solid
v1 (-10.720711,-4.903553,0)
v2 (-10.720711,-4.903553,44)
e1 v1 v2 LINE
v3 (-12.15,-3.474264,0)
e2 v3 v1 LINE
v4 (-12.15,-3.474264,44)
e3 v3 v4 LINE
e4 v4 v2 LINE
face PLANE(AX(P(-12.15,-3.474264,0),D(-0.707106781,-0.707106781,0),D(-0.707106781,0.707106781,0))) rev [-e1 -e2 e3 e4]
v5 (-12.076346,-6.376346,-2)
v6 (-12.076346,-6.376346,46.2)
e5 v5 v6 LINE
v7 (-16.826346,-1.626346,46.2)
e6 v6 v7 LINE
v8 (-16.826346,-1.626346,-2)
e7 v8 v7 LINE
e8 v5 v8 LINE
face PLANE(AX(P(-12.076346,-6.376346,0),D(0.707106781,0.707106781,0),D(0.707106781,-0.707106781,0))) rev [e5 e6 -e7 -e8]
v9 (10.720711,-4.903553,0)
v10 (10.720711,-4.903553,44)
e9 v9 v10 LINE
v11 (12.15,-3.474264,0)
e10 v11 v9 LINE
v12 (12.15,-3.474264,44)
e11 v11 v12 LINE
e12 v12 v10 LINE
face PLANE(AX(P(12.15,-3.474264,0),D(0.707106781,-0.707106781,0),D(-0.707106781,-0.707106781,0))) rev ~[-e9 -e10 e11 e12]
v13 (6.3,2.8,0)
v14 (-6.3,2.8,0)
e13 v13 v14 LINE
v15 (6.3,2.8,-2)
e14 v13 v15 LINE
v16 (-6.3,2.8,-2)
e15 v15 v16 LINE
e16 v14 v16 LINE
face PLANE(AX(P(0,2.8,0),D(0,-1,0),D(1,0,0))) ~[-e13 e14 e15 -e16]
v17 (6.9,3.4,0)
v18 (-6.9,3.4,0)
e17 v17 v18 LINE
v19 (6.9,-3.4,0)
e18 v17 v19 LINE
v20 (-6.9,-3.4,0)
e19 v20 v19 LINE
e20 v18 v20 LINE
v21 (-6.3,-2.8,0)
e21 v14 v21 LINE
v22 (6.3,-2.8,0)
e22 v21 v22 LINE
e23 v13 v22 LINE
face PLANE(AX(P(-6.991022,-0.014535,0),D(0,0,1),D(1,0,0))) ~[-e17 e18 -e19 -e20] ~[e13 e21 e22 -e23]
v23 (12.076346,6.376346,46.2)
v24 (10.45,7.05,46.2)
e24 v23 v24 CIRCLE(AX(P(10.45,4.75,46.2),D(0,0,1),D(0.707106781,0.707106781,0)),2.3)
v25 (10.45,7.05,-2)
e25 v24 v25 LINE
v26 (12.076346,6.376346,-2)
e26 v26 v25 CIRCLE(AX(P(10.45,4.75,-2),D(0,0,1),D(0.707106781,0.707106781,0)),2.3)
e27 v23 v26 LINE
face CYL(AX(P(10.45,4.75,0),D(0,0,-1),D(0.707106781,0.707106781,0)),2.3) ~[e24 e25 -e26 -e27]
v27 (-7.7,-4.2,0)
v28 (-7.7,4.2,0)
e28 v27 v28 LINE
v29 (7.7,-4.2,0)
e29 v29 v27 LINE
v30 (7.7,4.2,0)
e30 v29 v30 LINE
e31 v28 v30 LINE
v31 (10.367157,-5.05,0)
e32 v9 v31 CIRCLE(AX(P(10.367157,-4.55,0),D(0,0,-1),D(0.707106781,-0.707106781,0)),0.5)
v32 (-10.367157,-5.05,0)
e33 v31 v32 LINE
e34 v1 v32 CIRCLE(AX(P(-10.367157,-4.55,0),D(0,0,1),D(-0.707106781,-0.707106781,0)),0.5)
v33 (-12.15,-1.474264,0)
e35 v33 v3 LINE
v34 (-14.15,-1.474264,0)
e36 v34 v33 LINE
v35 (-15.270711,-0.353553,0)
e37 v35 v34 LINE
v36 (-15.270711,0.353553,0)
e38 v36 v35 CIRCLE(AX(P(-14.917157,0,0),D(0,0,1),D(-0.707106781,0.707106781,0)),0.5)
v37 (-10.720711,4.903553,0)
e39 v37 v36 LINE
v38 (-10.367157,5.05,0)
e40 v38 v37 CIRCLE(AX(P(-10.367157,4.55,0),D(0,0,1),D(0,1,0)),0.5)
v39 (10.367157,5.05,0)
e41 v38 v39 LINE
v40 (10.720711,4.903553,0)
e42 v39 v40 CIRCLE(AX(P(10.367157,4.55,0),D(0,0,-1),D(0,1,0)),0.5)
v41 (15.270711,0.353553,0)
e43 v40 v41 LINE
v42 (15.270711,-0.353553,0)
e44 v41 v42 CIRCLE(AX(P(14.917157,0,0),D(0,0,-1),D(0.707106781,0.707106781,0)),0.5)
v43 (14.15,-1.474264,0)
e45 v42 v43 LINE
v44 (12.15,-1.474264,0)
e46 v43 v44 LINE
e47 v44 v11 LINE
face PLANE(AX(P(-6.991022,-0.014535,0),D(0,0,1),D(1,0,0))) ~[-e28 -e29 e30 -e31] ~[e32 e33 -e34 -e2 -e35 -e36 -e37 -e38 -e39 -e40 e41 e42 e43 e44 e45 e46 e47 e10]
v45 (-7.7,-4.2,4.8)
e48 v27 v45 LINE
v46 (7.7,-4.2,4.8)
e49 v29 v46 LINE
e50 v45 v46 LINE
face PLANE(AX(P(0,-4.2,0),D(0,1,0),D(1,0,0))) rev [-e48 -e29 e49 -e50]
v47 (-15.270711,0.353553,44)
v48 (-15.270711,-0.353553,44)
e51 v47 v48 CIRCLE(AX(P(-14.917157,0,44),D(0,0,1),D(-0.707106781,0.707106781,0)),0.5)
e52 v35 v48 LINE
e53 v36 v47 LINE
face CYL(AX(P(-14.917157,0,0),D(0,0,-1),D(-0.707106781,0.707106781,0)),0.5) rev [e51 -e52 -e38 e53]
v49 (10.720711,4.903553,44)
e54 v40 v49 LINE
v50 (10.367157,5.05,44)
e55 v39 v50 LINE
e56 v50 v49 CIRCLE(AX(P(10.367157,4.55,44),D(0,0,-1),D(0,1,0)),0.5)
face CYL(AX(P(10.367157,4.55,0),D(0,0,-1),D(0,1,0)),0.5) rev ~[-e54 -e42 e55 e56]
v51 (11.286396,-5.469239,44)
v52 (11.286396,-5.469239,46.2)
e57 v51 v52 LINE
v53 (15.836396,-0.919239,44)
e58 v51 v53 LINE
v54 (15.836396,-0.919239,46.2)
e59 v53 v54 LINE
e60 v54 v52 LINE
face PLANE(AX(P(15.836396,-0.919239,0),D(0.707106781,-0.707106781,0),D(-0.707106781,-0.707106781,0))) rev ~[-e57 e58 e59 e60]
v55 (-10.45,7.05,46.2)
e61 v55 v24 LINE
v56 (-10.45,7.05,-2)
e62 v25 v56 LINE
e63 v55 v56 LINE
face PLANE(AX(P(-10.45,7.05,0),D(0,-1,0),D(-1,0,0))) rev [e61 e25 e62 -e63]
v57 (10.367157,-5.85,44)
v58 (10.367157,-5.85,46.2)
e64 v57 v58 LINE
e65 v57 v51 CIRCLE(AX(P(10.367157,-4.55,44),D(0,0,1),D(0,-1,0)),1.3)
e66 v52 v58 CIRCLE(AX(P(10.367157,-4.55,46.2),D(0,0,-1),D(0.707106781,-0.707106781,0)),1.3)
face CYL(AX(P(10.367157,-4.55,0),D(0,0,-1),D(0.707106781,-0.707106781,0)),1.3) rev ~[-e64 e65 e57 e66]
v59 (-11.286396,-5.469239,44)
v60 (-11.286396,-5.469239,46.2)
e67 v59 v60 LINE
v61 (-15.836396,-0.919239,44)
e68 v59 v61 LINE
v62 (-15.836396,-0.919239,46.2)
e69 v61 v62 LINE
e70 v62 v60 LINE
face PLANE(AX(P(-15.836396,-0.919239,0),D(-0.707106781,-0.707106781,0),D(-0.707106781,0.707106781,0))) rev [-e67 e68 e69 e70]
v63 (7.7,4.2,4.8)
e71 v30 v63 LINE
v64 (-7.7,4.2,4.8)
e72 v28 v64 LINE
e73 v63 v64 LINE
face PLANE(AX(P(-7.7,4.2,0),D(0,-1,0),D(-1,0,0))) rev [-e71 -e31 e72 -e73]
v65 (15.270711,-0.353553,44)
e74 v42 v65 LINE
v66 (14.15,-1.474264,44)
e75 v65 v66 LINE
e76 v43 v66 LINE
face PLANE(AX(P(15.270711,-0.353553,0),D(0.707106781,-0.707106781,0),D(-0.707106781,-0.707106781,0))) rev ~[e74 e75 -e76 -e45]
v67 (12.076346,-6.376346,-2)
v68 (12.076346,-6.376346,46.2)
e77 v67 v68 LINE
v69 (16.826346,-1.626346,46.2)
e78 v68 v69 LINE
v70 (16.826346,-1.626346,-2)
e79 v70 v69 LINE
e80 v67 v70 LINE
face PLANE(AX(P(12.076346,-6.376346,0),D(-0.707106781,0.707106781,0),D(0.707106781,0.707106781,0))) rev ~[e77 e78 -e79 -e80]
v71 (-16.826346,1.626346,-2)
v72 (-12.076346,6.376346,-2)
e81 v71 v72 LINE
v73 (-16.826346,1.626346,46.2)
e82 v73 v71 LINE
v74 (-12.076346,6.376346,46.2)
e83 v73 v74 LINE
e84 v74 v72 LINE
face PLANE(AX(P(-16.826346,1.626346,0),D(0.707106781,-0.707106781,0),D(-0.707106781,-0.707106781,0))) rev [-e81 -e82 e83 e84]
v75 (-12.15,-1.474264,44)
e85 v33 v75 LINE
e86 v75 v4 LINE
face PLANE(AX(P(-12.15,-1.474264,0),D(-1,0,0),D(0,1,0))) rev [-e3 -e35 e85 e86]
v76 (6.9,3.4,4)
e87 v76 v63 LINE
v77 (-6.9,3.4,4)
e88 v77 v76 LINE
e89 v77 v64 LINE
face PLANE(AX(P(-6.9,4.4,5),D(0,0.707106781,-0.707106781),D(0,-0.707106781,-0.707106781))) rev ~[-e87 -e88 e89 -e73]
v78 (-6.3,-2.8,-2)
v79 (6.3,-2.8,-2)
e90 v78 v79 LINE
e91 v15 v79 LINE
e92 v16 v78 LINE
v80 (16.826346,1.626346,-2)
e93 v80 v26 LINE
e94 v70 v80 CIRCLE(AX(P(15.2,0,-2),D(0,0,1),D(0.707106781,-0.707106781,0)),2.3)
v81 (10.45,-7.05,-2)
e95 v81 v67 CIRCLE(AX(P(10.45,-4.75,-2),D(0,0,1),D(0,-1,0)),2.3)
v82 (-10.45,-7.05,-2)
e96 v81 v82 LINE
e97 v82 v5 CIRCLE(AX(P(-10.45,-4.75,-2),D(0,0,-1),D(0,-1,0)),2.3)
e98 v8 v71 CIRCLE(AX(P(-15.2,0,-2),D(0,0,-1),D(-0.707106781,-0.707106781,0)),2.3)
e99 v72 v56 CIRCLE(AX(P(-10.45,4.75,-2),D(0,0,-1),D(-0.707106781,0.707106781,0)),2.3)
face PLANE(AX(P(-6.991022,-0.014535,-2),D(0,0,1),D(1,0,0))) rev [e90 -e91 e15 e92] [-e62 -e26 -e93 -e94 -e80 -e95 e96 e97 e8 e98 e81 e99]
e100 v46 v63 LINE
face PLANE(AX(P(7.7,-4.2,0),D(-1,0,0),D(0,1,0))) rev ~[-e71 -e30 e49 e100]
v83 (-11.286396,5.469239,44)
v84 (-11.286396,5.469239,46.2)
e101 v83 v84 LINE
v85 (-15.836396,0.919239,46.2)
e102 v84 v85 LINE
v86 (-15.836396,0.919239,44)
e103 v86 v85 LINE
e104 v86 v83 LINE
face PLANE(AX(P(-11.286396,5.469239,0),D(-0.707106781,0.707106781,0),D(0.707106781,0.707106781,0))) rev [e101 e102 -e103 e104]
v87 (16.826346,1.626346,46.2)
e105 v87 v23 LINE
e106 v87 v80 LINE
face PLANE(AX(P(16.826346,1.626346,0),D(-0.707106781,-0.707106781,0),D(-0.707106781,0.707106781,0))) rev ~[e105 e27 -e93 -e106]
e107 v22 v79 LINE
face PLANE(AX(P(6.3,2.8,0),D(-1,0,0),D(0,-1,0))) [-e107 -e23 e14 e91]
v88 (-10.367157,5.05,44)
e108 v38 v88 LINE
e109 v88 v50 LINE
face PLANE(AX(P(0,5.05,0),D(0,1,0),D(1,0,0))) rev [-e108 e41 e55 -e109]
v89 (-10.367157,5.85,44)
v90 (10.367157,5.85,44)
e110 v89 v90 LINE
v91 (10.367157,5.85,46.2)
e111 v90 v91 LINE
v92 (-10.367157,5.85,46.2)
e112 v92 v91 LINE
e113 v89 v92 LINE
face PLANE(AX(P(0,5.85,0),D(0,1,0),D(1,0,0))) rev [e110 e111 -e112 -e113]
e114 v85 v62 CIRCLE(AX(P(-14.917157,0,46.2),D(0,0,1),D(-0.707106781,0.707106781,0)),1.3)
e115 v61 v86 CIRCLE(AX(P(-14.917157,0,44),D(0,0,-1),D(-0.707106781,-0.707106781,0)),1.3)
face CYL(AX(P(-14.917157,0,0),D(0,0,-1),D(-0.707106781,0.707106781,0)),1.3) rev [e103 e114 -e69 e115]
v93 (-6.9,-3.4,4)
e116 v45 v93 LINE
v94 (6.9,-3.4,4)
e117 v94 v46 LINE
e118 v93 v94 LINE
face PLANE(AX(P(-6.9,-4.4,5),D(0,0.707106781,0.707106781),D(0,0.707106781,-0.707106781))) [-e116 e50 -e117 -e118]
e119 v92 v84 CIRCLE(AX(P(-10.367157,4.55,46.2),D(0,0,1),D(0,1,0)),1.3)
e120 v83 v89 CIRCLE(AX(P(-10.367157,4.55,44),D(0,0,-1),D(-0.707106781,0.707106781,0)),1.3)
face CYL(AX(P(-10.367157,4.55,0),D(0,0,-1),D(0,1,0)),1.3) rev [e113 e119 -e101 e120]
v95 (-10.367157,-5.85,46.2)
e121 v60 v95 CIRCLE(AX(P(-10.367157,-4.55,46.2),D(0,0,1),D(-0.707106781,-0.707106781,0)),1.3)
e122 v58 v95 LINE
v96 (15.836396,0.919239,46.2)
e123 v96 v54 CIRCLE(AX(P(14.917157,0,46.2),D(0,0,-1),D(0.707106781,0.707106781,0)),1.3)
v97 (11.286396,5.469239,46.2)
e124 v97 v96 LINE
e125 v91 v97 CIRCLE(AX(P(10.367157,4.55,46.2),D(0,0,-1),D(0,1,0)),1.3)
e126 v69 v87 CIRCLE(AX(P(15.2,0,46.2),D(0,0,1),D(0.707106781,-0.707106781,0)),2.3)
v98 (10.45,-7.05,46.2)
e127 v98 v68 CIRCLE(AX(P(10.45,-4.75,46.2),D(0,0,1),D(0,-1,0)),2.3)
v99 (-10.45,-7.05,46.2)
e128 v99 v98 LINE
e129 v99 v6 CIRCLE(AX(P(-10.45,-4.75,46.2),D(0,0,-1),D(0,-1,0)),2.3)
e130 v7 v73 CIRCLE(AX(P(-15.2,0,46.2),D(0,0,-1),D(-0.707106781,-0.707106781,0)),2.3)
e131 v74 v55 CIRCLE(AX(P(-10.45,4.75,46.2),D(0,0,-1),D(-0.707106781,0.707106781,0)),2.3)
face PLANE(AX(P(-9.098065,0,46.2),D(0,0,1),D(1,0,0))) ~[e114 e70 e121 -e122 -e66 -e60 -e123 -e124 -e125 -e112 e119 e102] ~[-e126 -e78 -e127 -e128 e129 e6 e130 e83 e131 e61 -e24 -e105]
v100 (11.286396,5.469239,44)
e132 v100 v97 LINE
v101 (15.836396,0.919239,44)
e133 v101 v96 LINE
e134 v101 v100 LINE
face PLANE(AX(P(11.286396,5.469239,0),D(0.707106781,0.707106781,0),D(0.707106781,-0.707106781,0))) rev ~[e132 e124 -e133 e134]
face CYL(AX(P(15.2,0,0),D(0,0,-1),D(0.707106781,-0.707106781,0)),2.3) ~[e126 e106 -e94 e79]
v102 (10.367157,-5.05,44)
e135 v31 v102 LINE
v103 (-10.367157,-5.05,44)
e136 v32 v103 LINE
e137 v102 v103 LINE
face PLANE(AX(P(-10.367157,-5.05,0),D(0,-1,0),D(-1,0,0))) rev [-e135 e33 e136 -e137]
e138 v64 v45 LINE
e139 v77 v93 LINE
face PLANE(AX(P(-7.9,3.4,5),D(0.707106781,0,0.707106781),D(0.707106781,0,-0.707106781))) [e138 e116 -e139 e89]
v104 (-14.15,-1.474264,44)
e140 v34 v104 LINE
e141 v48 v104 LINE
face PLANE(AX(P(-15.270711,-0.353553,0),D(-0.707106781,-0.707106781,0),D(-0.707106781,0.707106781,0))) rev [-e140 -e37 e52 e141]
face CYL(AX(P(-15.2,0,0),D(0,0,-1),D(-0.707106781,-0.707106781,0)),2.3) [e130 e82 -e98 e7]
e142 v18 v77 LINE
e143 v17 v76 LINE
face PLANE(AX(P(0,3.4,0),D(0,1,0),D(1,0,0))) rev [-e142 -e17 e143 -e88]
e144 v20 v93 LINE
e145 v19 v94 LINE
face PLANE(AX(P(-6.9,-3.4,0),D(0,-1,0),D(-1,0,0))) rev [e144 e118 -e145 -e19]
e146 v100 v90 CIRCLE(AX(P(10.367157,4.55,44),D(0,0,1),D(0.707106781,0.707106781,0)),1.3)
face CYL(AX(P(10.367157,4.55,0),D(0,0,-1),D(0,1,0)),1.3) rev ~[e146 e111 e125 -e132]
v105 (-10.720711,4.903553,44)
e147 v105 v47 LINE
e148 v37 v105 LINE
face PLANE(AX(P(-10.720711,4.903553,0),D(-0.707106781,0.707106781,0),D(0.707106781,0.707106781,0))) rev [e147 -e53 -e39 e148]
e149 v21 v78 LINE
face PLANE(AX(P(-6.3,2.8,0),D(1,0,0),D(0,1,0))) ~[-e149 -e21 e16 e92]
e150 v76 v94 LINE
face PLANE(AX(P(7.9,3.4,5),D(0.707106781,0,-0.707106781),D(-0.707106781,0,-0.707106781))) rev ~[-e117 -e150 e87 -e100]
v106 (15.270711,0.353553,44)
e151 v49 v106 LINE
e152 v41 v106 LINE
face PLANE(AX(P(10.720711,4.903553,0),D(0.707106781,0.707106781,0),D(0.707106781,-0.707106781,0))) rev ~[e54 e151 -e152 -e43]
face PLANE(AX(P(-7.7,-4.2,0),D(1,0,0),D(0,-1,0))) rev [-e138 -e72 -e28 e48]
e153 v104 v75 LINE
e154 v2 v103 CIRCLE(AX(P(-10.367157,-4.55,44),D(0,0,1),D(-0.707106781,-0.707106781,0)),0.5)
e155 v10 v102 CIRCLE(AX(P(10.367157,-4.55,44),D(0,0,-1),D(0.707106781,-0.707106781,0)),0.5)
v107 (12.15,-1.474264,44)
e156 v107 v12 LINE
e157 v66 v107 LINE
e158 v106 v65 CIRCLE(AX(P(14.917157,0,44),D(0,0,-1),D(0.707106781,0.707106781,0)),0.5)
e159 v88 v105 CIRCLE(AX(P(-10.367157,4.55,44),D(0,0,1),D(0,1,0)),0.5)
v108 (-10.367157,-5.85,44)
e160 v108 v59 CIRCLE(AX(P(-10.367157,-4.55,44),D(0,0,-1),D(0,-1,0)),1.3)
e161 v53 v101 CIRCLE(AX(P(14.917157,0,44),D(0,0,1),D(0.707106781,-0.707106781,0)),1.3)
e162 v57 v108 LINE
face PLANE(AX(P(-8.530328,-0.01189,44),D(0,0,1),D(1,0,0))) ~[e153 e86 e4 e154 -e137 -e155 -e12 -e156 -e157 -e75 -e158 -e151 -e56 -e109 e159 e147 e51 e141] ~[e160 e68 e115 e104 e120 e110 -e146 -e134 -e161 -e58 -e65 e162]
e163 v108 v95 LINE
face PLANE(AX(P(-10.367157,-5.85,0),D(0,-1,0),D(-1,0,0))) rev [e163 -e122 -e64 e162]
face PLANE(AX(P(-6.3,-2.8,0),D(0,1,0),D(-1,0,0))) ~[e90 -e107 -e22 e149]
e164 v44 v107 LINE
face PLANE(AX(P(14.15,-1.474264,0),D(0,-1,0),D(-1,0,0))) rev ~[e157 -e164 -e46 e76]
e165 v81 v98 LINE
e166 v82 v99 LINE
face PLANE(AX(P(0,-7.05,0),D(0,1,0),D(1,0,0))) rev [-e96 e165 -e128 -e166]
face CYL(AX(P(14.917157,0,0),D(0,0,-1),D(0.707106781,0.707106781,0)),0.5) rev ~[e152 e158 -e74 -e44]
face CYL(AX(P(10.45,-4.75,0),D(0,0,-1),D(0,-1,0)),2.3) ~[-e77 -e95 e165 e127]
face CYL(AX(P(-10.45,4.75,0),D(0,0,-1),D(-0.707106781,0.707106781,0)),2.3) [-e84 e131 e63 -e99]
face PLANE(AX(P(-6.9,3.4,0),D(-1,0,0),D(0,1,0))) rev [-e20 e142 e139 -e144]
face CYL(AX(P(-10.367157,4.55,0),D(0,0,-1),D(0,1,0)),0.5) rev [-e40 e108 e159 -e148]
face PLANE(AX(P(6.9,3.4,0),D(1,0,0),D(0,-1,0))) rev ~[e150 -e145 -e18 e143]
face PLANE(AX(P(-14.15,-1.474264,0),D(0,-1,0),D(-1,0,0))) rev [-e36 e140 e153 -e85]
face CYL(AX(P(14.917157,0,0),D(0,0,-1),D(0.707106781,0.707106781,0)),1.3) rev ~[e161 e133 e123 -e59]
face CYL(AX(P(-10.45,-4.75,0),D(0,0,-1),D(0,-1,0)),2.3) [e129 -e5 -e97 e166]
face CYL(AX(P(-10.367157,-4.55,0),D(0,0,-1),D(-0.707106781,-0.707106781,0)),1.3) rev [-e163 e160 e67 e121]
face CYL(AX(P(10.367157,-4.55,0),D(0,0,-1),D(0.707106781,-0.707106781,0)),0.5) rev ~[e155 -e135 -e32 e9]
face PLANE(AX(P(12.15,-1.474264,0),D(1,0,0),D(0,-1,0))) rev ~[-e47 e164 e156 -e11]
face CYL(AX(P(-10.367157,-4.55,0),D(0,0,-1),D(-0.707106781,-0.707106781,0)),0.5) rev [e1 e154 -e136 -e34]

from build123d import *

# Parameters (mm, degrees)
F1_DEPTH     = 2
F2_DEPTH     = 5
F3_DEPTH     = 44
F4_DEPTH     = 46.2
F6_T1_DEPTH  = 6.8
F6_T3_DEPTH  = 13.8
F6_T9_DEPTH  = 16.371682988
F6_T15_DEPTH = 9.371682988
F6_T24_DEPTH = 9.371682988
F6_T30_DEPTH = 16.371682988
F6_T39_DEPTH = 16.371682988
F6_T45_DEPTH = 9.371682988
F6_T54_DEPTH = 16.371682988
F6_T60_DEPTH = 9.371682988


# Not quite as in the source:
# - a fillet or chamfer that OpenCascade refuses, or shapes differently, is made with other operations: its cross-section is extruded or revolved along the edge and cut away or added
# - a feature names something its author has since deleted; it is built from what else it names


with BuildPart() as f1:
    # F0 (on Top) → F1 (new body)
    with BuildSketch(Plane.XY):
        with BuildLine():
            Line((10.3671572875, 5.05), (0, 5.05))
            Line((0, 5.05), (0, 4.2))
            Line((0, 4.2), (7.7, 4.2))
            Line((7.7, 4.2), (7.7, -4.2))
            Line((7.7, -4.2), (0, -4.2))
            Line((0, -4.2), (0, -5.05))
            Line((0, -5.05), (10.3671572875, -5.05))
            ThreePointArc((10.3671572875, -5.05), (10.5584990037, -5.0119397663), (10.7207106781, -4.9035533906))
            Line((10.7207106781, -4.9035533906), (12.15, -3.4742640687))
            Line((12.15, -3.4742640687), (12.15, -1.4742640687))
            Line((12.15, -1.4742640687), (14.15, -1.4742640687))
            Line((14.15, -1.4742640687), (15.2707106781, -0.3535533906))
            ThreePointArc((15.2707106781, -0.3535533906), (15.4171572875, 0), (15.2707106781, 0.3535533906))
            Line((15.2707106781, 0.3535533906), (10.7207106781, 4.9035533906))
            ThreePointArc((10.7207106781, 4.9035533906), (10.5584990037, 5.0119397663), (10.3671572875, 5.05))
        make_face()
        Polygon((6.9, 3.4), (0, 3.4), (0, 2.8), (6.3, 2.8), (6.3, -2.8), (0, -2.8), (0, -3.4), (6.9, -3.4), align=None)
        Polygon((7.7, 4.2), (0, 4.2), (0, 3.4), (6.9, 3.4), (6.9, -3.4), (0, -3.4), (0, -4.2), (7.7, -4.2), align=None)
        with BuildLine():
            Line((10.45, 7.05), (0, 7.05))
            Line((0, 7.05), (0, 5.85))
            Line((0, 5.85), (10.3671572875, 5.85))
            ThreePointArc((10.3671572875, 5.85), (10.8646457496, 5.7510433923), (11.2863961031, 5.4692388155))
            Line((11.2863961031, 5.4692388155), (15.8363961031, 0.9192388155))
            ThreePointArc((15.8363961031, 0.9192388155), (16.2171572875, 0), (15.8363961031, -0.9192388155))
            Line((15.8363961031, -0.9192388155), (11.2863961031, -5.4692388155))
            ThreePointArc((11.2863961031, -5.4692388155), (10.8646457496, -5.7510433923), (10.3671572875, -5.85))
            Line((10.3671572875, -5.85), (0, -5.85))
            Line((0, -5.85), (0, -7.05))
            Line((0, -7.05), (10.45, -7.05))
            ThreePointArc((10.45, -7.05), (11.3301718944, -6.8749229248), (12.0763455967, -6.3763455967))
            Line((12.0763455967, -6.3763455967), (16.8263455967, -1.6263455967))
            ThreePointArc((16.8263455967, -1.6263455967), (17.5, 0), (16.8263455967, 1.6263455967))
            Line((16.8263455967, 1.6263455967), (12.0763455967, 6.3763455967))
            ThreePointArc((12.0763455967, 6.3763455967), (11.3301718944, 6.8749229248), (10.45, 7.05))
        make_face()
        with BuildLine():
            Line((10.3671572875, 5.85), (0, 5.85))
            Line((0, 5.85), (0, 5.05))
            Line((0, 5.05), (10.3671572875, 5.05))
            ThreePointArc((10.3671572875, 5.05), (10.5584990037, 5.0119397663), (10.7207106781, 4.9035533906))
            Line((10.7207106781, 4.9035533906), (15.2707106781, 0.3535533906))
            ThreePointArc((15.2707106781, 0.3535533906), (15.4171572875, 0), (15.2707106781, -0.3535533906))
            Line((15.2707106781, -0.3535533906), (14.15, -1.4742640687))
            Line((14.15, -1.4742640687), (12.15, -1.4742640687))
            Line((12.15, -1.4742640687), (12.15, -3.4742640687))
            Line((12.15, -3.4742640687), (10.7207106781, -4.9035533906))
            ThreePointArc((10.7207106781, -4.9035533906), (10.5584990037, -5.0119397663), (10.3671572875, -5.05))
            Line((10.3671572875, -5.05), (0, -5.05))
            Line((0, -5.05), (0, -5.85))
            Line((0, -5.85), (10.3671572875, -5.85))
            ThreePointArc((10.3671572875, -5.85), (10.8646457496, -5.7510433923), (11.2863961031, -5.4692388155))
            Line((11.2863961031, -5.4692388155), (15.8363961031, -0.9192388155))
            ThreePointArc((15.8363961031, -0.9192388155), (16.2171572875, 0), (15.8363961031, 0.9192388155))
            Line((15.8363961031, 0.9192388155), (11.2863961031, 5.4692388155))
            ThreePointArc((11.2863961031, 5.4692388155), (10.8646457496, 5.7510433923), (10.3671572875, 5.85))
        make_face()
    extrude(amount=-F1_DEPTH)

    # F0 (on Top) → F2 (join)
    with BuildSketch(Plane.XY):
        Polygon((7.7, 4.2), (0, 4.2), (0, 3.4), (6.9, 3.4), (6.9, -3.4), (0, -3.4), (0, -4.2), (7.7, -4.2), align=None)
    extrude(amount=F2_DEPTH)

    # F0 (on Top) → F3 (join)
    with BuildSketch(Plane.XY):
        with BuildLine():
            Line((10.3671572875, 5.85), (0, 5.85))
            Line((0, 5.85), (0, 5.05))
            Line((0, 5.05), (10.3671572875, 5.05))
            ThreePointArc((10.3671572875, 5.05), (10.5584990037, 5.0119397663), (10.7207106781, 4.9035533906))
            Line((10.7207106781, 4.9035533906), (15.2707106781, 0.3535533906))
            ThreePointArc((15.2707106781, 0.3535533906), (15.4171572875, 0), (15.2707106781, -0.3535533906))
            Line((15.2707106781, -0.3535533906), (14.15, -1.4742640687))
            Line((14.15, -1.4742640687), (12.15, -1.4742640687))
            Line((12.15, -1.4742640687), (12.15, -3.4742640687))
            Line((12.15, -3.4742640687), (10.7207106781, -4.9035533906))
            ThreePointArc((10.7207106781, -4.9035533906), (10.5584990037, -5.0119397663), (10.3671572875, -5.05))
            Line((10.3671572875, -5.05), (0, -5.05))
            Line((0, -5.05), (0, -5.85))
            Line((0, -5.85), (10.3671572875, -5.85))
            ThreePointArc((10.3671572875, -5.85), (10.8646457496, -5.7510433923), (11.2863961031, -5.4692388155))
            Line((11.2863961031, -5.4692388155), (15.8363961031, -0.9192388155))
            ThreePointArc((15.8363961031, -0.9192388155), (16.2171572875, 0), (15.8363961031, 0.9192388155))
            Line((15.8363961031, 0.9192388155), (11.2863961031, 5.4692388155))
            ThreePointArc((11.2863961031, 5.4692388155), (10.8646457496, 5.7510433923), (10.3671572875, 5.85))
        make_face()
    extrude(amount=F3_DEPTH)

    # F0 (on Top) → F4 (join)
    with BuildSketch(Plane.XY):
        with BuildLine():
            Line((10.45, 7.05), (0, 7.05))
            Line((0, 7.05), (0, 5.85))
            Line((0, 5.85), (10.3671572875, 5.85))
            ThreePointArc((10.3671572875, 5.85), (10.8646457496, 5.7510433923), (11.2863961031, 5.4692388155))
            Line((11.2863961031, 5.4692388155), (15.8363961031, 0.9192388155))
            ThreePointArc((15.8363961031, 0.9192388155), (16.2171572875, 0), (15.8363961031, -0.9192388155))
            Line((15.8363961031, -0.9192388155), (11.2863961031, -5.4692388155))
            ThreePointArc((11.2863961031, -5.4692388155), (10.8646457496, -5.7510433923), (10.3671572875, -5.85))
            Line((10.3671572875, -5.85), (0, -5.85))
            Line((0, -5.85), (0, -7.05))
            Line((0, -7.05), (10.45, -7.05))
            ThreePointArc((10.45, -7.05), (11.3301718944, -6.8749229248), (12.0763455967, -6.3763455967))
            Line((12.0763455967, -6.3763455967), (16.8263455967, -1.6263455967))
            ThreePointArc((16.8263455967, -1.6263455967), (17.5, 0), (16.8263455967, 1.6263455967))
            Line((16.8263455967, 1.6263455967), (12.0763455967, 6.3763455967))
            ThreePointArc((12.0763455967, 6.3763455967), (11.3301718944, 6.8749229248), (10.45, 7.05))
        make_face()
    extrude(amount=F4_DEPTH)

    # F5: F1 across face


with BuildPart() as f1_1:
    add(f1.part)
    add(f1.part.mirror(Plane(origin=(0, 5.8802646888, 19.9395384914), x_dir=(0, -1, 0), z_dir=(-1, 0, 0))))

    # F6: chamfer of 1 on 4 edges, made by hand

    # F6_s2 → F6_t1 (cut)
    with BuildSketch(Plane.XZ.offset(-3.4)):
        Polygon((7.9, 5), (6.9, 4), (6.9, 5), align=None)
        Polygon((-7.9, 5), (-6.9, 4), (-6.9, 5), align=None)
    extrude(amount=F6_T1_DEPTH, mode=Mode.SUBTRACT)

    # F6_s4 → F6_t3 (cut)
    with BuildSketch(Plane.YZ.offset(-6.9)):
        Polygon((4.4, 5), (3.4, 4), (3.4, 5), align=None)
        Polygon((-4.4, 5), (-3.4, 4), (-3.4, 5), align=None)
    extrude(amount=F6_T3_DEPTH, mode=Mode.SUBTRACT)


with BuildPart() as f6_tool7:
    # F6_s8 → F6_t9 (new body)
    with BuildSketch(Plane.YZ.offset(9.471682988)):
        Polygon((4.4, 5), (3.4, 4), (3.4, 5), align=None)
    extrude(amount=-F6_T9_DEPTH)

    split(bisect_by=Plane.YZ.offset(7.7), keep=Keep.BOTTOM)

    split(bisect_by=Plane.YZ.offset(6.9), keep=Keep.TOP)

    split(bisect_by=Plane.XZ.offset(-4.2), keep=Keep.TOP)


with BuildPart() as f6_tool13:
    # F6_s14 → F6_t15 (new body)
    with BuildSketch(Plane.XZ.offset(-5.971682988)):
        Polygon((7.9, 5), (6.9, 4), (6.9, 5), align=None)
    extrude(amount=F6_T15_DEPTH)

    split(bisect_by=Plane.YZ.offset(7.7), keep=Keep.BOTTOM)

    split(bisect_by=Plane.XZ.offset(-3.4), keep=Keep.BOTTOM)

    split(bisect_by=Plane.XZ.offset(-4.2), keep=Keep.TOP)


with BuildPart() as f6_tool7_1:
    add(f6_tool7.part)

    # F6_t19: intersect F6_tool13
    add(f6_tool13.part, mode=Mode.INTERSECT)


with BuildPart() as f1_2:
    add(f1_1.part)

    # F6_t5: cut F6_tool7
    add(f6_tool7_1.part, mode=Mode.SUBTRACT)


with BuildPart() as f6_tool22:
    # F6_s23 → F6_t24 (new body)
    with BuildSketch(Plane.XZ.offset(-3.4)):
        Polygon((7.9, 5), (6.9, 4), (6.9, 5), align=None)
    extrude(amount=F6_T24_DEPTH)

    split(bisect_by=Plane.YZ.offset(7.7), keep=Keep.BOTTOM)

    split(bisect_by=Plane.XZ.offset(3.4), keep=Keep.TOP)

    split(bisect_by=Plane.XZ.offset(4.2), keep=Keep.BOTTOM)


with BuildPart() as f6_tool28:
    # F6_s29 → F6_t30 (new body)
    with BuildSketch(Plane.YZ.offset(-6.9)):
        Polygon((-4.4, 5), (-3.4, 4), (-3.4, 5), align=None)
    extrude(amount=F6_T30_DEPTH)

    split(bisect_by=Plane.YZ.offset(7.7), keep=Keep.BOTTOM)

    split(bisect_by=Plane.YZ.offset(6.9), keep=Keep.TOP)

    split(bisect_by=Plane.XZ.offset(4.2), keep=Keep.BOTTOM)


with BuildPart() as f6_tool22_1:
    add(f6_tool22.part)

    # F6_t34: intersect F6_tool28
    add(f6_tool28.part, mode=Mode.INTERSECT)


with BuildPart() as f1_3:
    add(f1_2.part)

    # F6_t20: cut F6_tool22
    add(f6_tool22_1.part, mode=Mode.SUBTRACT)


with BuildPart() as f6_tool37:
    # F6_s38 → F6_t39 (new body)
    with BuildSketch(Plane.YZ.offset(6.9)):
        Polygon((4.4, 5), (3.4, 4), (3.4, 5), align=None)
    extrude(amount=-F6_T39_DEPTH)

    split(bisect_by=Plane.YZ.offset(-6.9), keep=Keep.BOTTOM)

    split(bisect_by=Plane.XZ.offset(-4.2), keep=Keep.TOP)

    split(bisect_by=Plane.YZ.offset(-7.7), keep=Keep.TOP)


with BuildPart() as f6_tool43:
    # F6_s44 → F6_t45 (new body)
    with BuildSketch(Plane.XZ.offset(-5.971682988)):
        Polygon((-7.9, 5), (-6.9, 4), (-6.9, 5), align=None)
    extrude(amount=F6_T45_DEPTH)

    split(bisect_by=Plane.XZ.offset(-3.4), keep=Keep.BOTTOM)

    split(bisect_by=Plane.XZ.offset(-4.2), keep=Keep.TOP)

    split(bisect_by=Plane.YZ.offset(-7.7), keep=Keep.TOP)


with BuildPart() as f6_tool37_1:
    add(f6_tool37.part)

    # F6_t49: intersect F6_tool43
    add(f6_tool43.part, mode=Mode.INTERSECT)


with BuildPart() as f1_4:
    add(f1_3.part)

    # F6_t35: cut F6_tool37
    add(f6_tool37_1.part, mode=Mode.SUBTRACT)


with BuildPart() as f6_tool52:
    # F6_s53 → F6_t54 (new body)
    with BuildSketch(Plane.YZ.offset(-9.471682988)):
        Polygon((-4.4, 5), (-3.4, 4), (-3.4, 5), align=None)
    extrude(amount=F6_T54_DEPTH)

    split(bisect_by=Plane.YZ.offset(-6.9), keep=Keep.BOTTOM)

    split(bisect_by=Plane.YZ.offset(-7.7), keep=Keep.TOP)

    split(bisect_by=Plane.XZ.offset(4.2), keep=Keep.BOTTOM)


with BuildPart() as f6_tool58:
    # F6_s59 → F6_t60 (new body)
    with BuildSketch(Plane.XZ.offset(-3.4)):
        Polygon((-7.9, 5), (-6.9, 4), (-6.9, 5), align=None)
    extrude(amount=F6_T60_DEPTH)

    split(bisect_by=Plane.XZ.offset(3.4), keep=Keep.TOP)

    split(bisect_by=Plane.YZ.offset(-7.7), keep=Keep.TOP)

    split(bisect_by=Plane.XZ.offset(4.2), keep=Keep.BOTTOM)


with BuildPart() as f6_tool52_1:
    add(f6_tool52.part)

    # F6_t64: intersect F6_tool58
    add(f6_tool58.part, mode=Mode.INTERSECT)


with BuildPart() as f1_5:
    add(f1_4.part)

    # F6_t50: cut F6_tool52
    add(f6_tool52_1.part, mode=Mode.SUBTRACT)


solid = f1_5.part
